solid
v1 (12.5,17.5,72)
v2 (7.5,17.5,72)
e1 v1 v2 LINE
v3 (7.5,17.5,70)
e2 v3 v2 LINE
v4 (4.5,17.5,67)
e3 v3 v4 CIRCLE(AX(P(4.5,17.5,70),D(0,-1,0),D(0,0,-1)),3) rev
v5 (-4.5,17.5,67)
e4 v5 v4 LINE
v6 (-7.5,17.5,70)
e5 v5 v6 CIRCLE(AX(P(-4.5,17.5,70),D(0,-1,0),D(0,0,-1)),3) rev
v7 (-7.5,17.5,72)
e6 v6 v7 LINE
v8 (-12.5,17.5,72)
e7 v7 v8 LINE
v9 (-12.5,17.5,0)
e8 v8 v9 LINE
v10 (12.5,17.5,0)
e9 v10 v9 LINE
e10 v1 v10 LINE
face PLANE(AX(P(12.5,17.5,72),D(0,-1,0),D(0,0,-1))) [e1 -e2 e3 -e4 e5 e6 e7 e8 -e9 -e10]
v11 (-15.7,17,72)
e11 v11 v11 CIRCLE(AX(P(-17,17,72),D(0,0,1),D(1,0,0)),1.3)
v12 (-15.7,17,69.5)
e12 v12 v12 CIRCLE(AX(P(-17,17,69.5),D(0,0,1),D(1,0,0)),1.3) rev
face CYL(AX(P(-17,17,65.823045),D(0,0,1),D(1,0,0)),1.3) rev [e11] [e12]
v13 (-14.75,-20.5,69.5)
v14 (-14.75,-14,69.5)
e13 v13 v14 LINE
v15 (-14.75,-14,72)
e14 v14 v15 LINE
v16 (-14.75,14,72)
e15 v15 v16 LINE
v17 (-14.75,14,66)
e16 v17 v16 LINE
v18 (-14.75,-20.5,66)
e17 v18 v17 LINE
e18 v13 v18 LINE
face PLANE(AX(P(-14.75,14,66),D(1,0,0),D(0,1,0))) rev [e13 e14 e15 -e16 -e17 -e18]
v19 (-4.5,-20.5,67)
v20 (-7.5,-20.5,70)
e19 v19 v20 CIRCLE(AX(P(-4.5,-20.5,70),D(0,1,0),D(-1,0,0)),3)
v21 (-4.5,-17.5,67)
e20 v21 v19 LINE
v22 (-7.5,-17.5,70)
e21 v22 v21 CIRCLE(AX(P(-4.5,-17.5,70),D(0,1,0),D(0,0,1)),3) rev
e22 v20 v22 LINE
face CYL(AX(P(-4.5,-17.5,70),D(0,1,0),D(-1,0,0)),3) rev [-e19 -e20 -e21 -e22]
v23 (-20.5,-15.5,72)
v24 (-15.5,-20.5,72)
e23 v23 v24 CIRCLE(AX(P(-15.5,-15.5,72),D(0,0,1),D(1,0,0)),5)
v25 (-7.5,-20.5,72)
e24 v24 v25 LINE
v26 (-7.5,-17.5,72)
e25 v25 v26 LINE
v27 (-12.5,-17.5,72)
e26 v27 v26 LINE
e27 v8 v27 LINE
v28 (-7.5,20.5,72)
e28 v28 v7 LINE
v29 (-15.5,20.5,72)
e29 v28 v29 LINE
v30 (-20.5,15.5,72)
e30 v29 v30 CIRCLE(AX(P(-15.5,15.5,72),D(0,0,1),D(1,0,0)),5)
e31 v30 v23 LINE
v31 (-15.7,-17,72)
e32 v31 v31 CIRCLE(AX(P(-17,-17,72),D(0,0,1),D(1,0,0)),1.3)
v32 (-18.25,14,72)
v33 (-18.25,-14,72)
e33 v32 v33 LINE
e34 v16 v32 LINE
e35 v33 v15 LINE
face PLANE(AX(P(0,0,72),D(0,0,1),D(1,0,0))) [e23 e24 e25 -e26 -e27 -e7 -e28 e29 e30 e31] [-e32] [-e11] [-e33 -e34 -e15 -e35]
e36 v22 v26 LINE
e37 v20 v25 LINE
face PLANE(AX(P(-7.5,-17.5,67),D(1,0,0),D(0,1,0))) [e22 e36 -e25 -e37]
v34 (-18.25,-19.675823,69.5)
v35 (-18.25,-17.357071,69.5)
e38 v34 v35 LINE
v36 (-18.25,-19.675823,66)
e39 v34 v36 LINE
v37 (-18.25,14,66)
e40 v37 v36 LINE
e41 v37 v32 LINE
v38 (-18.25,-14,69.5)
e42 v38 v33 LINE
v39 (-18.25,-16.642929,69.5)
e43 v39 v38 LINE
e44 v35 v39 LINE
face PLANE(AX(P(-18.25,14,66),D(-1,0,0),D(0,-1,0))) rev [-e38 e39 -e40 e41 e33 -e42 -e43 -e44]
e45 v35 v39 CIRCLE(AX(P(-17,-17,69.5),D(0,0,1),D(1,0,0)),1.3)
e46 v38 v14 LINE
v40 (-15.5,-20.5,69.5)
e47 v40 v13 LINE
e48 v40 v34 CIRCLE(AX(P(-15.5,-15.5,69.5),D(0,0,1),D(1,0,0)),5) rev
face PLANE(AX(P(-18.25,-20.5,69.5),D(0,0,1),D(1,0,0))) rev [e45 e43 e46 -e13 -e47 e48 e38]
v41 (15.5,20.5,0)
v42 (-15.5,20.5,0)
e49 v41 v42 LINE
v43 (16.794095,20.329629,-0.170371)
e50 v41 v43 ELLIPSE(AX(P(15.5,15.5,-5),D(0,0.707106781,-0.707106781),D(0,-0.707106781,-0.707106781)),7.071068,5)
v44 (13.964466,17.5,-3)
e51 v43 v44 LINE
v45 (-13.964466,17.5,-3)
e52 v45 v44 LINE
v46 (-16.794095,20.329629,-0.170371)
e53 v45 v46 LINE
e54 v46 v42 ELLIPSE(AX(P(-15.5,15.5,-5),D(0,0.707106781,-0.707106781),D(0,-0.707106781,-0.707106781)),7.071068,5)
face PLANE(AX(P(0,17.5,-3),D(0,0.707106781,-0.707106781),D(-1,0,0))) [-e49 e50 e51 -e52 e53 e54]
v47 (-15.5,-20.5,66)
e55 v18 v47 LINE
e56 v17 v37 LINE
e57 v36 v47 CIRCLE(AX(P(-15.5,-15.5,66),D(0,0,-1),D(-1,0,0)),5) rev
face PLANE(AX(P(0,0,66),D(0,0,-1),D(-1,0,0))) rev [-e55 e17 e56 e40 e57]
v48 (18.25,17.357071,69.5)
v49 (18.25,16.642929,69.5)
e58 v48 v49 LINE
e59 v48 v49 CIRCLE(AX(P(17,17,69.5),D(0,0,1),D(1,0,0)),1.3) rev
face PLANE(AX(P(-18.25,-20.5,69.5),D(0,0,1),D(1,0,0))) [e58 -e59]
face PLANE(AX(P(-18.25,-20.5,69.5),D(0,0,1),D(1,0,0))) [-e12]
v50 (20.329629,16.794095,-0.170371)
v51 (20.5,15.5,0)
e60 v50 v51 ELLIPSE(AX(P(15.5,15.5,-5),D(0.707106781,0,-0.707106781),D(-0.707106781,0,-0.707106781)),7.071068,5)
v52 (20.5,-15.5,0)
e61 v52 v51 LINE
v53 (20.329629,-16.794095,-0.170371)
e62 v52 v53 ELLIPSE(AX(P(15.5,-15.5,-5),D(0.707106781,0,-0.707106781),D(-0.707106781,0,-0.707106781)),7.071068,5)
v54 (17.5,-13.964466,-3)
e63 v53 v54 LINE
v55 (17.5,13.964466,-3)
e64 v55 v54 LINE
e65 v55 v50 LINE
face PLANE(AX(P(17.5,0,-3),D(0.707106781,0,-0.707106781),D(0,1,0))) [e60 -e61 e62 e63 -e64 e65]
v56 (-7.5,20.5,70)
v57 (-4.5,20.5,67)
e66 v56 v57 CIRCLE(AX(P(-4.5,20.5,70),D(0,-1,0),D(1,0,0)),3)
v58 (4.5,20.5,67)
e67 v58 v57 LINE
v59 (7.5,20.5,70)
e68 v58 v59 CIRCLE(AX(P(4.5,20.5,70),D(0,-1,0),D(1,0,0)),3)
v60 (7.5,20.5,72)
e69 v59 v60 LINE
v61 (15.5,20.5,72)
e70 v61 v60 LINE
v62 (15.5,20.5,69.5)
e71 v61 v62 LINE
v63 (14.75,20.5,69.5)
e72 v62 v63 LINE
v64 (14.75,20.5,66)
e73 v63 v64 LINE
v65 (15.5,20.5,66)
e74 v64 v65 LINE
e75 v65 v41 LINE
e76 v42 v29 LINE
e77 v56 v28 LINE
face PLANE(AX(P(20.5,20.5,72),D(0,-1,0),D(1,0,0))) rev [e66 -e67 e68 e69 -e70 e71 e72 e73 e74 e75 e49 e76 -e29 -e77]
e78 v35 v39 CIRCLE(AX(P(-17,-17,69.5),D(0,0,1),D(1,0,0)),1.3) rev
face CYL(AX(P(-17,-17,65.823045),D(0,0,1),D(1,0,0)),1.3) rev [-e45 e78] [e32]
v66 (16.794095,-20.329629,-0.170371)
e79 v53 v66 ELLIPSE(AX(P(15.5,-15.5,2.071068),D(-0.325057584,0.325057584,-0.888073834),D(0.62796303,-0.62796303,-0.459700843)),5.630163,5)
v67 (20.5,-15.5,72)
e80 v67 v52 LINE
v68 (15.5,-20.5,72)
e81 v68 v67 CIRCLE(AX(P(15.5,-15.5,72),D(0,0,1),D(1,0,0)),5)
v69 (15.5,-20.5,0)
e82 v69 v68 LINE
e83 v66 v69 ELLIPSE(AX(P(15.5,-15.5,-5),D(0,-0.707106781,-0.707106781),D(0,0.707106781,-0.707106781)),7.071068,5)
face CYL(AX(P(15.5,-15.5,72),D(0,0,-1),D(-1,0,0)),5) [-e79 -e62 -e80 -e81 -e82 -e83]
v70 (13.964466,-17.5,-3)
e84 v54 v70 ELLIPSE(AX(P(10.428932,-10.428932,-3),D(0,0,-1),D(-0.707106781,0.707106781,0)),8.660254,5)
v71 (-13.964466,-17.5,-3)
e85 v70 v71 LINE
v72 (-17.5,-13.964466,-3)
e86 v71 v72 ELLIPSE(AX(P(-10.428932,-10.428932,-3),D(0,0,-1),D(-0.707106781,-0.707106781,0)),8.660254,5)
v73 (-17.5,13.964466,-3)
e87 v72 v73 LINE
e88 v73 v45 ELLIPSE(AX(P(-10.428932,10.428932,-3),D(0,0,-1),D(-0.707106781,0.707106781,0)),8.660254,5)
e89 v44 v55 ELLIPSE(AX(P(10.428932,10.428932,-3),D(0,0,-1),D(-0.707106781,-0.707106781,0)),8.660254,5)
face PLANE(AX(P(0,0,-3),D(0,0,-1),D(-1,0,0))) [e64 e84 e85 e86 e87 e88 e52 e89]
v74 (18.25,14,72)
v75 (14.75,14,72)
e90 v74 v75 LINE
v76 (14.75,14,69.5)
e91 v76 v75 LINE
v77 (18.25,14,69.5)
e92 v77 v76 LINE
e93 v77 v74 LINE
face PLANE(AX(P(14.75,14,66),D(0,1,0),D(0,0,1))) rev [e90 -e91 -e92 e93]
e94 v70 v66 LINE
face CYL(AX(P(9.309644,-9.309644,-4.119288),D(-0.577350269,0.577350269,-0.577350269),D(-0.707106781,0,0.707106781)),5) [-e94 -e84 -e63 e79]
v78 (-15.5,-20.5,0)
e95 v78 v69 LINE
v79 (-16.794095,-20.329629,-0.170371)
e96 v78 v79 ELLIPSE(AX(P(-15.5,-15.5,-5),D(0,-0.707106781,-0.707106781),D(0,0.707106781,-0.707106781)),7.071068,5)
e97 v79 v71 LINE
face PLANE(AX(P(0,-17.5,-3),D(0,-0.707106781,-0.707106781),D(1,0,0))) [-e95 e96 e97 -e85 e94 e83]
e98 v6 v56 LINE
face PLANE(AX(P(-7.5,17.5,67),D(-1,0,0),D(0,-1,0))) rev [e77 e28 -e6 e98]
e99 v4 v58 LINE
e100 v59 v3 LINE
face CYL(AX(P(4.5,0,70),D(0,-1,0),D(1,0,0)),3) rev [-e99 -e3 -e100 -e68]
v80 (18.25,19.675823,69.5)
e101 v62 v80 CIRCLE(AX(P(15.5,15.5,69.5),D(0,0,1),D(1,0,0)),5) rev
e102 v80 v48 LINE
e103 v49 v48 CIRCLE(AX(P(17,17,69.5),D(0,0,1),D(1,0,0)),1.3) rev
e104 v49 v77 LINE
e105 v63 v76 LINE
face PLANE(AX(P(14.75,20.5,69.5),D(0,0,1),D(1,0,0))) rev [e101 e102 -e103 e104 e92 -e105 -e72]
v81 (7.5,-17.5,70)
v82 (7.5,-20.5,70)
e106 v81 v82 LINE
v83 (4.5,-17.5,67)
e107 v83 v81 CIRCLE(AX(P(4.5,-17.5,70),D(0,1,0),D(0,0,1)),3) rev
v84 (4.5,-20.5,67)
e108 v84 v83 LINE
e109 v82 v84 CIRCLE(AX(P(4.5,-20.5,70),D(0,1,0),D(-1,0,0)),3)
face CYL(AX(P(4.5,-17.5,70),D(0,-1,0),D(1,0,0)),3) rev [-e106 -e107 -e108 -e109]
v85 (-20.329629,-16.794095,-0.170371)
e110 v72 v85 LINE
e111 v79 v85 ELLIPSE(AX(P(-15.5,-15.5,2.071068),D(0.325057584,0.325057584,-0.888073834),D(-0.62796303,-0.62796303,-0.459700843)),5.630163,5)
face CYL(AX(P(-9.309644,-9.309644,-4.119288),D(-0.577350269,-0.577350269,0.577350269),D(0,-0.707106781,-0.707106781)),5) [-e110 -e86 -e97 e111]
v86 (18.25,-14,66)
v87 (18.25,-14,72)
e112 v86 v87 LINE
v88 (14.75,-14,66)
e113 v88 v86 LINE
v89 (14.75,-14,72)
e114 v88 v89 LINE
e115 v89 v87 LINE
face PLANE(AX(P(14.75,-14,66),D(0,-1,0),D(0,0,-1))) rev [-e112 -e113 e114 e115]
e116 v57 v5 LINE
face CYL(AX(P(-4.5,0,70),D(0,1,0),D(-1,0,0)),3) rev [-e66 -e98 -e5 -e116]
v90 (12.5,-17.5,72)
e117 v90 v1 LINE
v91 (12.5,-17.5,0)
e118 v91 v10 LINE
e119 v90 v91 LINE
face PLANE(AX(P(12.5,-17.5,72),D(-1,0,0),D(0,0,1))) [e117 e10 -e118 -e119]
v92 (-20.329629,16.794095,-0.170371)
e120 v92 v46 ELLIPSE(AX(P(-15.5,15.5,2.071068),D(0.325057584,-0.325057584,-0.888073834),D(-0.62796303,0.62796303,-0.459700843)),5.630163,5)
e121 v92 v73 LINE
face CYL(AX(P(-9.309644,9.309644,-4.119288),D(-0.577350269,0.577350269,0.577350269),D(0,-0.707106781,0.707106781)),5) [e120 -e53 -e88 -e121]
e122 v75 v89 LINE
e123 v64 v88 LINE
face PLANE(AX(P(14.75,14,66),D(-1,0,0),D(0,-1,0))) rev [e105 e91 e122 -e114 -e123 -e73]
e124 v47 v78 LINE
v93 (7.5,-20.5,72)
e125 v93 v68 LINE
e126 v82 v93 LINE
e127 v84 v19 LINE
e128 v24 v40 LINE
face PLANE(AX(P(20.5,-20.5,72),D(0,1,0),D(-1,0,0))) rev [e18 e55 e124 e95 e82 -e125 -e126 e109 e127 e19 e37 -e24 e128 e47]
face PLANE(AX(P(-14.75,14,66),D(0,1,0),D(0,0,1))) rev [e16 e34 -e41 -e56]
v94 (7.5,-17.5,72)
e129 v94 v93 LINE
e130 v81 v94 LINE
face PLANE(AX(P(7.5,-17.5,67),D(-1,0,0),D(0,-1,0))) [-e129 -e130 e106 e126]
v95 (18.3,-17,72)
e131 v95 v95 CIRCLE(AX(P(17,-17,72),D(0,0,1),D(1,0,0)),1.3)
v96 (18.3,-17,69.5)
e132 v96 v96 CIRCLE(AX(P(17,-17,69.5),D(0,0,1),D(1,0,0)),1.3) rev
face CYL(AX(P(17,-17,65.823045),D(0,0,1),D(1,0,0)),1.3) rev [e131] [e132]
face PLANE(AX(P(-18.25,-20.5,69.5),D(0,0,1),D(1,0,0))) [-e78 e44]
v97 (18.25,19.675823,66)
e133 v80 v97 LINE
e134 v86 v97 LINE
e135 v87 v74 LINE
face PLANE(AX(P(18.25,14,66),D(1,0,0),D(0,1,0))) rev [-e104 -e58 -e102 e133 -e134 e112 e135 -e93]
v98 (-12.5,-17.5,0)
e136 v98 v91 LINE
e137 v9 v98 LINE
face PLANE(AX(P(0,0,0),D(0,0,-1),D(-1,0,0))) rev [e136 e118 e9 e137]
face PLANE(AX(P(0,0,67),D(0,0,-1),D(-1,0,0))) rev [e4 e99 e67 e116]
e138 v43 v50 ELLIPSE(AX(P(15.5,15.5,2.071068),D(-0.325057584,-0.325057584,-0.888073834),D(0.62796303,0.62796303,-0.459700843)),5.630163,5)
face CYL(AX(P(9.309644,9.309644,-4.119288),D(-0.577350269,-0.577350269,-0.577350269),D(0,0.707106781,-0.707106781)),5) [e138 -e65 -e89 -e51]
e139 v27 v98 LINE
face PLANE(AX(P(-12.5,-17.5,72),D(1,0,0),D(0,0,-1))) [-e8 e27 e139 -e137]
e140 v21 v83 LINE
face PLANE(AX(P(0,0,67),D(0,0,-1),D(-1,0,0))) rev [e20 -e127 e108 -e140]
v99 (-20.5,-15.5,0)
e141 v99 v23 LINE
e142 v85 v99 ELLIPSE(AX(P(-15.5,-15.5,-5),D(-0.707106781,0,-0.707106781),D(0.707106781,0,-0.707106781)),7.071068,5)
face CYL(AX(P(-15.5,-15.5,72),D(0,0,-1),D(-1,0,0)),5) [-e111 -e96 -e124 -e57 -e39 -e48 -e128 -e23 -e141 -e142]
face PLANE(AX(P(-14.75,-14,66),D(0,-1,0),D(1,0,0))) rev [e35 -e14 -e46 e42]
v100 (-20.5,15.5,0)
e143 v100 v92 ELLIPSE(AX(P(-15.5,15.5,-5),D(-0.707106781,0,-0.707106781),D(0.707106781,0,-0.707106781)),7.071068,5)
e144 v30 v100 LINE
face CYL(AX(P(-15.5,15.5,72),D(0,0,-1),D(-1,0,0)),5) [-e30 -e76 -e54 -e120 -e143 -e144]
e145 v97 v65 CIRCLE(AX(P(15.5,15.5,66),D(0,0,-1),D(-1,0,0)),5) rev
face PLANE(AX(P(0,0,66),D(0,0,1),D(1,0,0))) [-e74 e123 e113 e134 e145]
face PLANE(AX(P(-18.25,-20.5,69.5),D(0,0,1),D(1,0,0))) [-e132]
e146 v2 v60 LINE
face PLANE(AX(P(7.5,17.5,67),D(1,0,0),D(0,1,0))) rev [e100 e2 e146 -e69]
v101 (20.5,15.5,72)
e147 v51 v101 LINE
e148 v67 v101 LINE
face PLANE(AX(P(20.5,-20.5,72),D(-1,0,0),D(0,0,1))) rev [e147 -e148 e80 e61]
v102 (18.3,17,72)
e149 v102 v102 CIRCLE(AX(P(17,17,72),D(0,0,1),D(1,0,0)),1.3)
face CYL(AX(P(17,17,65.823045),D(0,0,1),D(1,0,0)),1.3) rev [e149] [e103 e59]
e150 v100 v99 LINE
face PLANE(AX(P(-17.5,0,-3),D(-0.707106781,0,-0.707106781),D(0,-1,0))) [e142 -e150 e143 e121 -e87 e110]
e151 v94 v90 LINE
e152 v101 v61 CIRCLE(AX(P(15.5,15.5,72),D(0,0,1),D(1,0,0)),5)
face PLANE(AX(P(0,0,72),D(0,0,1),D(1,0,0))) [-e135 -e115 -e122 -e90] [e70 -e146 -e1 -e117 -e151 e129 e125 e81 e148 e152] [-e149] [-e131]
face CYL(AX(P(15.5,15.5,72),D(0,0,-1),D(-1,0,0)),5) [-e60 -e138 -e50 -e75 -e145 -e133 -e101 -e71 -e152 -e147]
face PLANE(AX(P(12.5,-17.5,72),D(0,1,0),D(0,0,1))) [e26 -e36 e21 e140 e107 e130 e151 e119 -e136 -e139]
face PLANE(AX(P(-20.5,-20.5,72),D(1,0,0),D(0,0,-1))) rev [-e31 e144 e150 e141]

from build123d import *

# Parameters (mm, degrees)
SKETCH_1_W             = 41
SKETCH_1_H             = 41
SKETCH_1_W_2           = 25
SKETCH_1_H_2           = 35
EXTRUDE_1_DEPTH        = 72
SKETCH_2_W             = 41
SKETCH_2_H             = 41
EXTRUDE_2_DEPTH        = 3
CHAMFER_1_SIZE         = 3
FILLET_1_R             = 5
SKETCH_3_W             = 15
SKETCH_3_H             = 3
CUT_EXTRUDE_1_DEPTH    = 5
FILLET_2_R             = 3
SKETCH_4_W             = 3.5
SKETCH_4_H             = 28
CUT_EXTRUDE_2_DEPTH    = 6
SKETCH_6_W             = 3.5
SKETCH_6_H             = 3.5
CUT_EXTRUDE_4_DEPTH    = 83.428757118
SKETCH_7_W             = 3.5
SKETCH_7_H             = 3.5
CUT_EXTRUDE_5_DEPTH    = 83.428757118
FILLET_2_OF_MIRROR_1_R = 3
SKETCH_8_R             = 1.3
CUT_EXTRUDE_6_DEPTH    = 2.5


with BuildPart() as part:
    # ｽｹｯﾁ1 → ﾎﾞｽ - 押し出し1 (new body)
    with BuildSketch(Plane.XY):
        Rectangle(SKETCH_1_W, SKETCH_1_H)
        Rectangle(SKETCH_1_W_2, SKETCH_1_H_2, mode=Mode.SUBTRACT)
    extrude(amount=EXTRUDE_1_DEPTH)

    # ｽｹｯﾁ2 → ﾎﾞｽ - 押し出し2 (add)
    with BuildSketch(Plane(origin=(0, 0, 0), x_dir=(-1, 0, 0), z_dir=(0, 0, -1))):
        Rectangle(SKETCH_2_W, SKETCH_2_H)
    extrude(amount=EXTRUDE_2_DEPTH)

    # 面取り1
    chamfer_1_edges = [part.edges().sort_by_distance(p)[0] for p in [
        (20.5, 0, -3),
        (0, -20.5, -3),
        (-20.5, 0, -3),
        (0, 20.5, -3),
    ]]
    chamfer(chamfer_1_edges, length=CHAMFER_1_SIZE)

    # ﾌｨﾚｯﾄ1
    # the kernel refuses this fillet: 5 mm, written as the material it takes off along each edge
    with BuildSketch(Plane(origin=(-20.5, 20.5, 84.5), x_dir=(0, -1, 0), z_dir=(0, 0, -1)), Plane(origin=(20.5, 20.5, -12.5), x_dir=(0, -1, 0), z_dir=(0, 0, 1)), Plane(origin=(20.5, -20.5, -12.5), x_dir=(-1, 0, 0), z_dir=(0, 0, 1)), Plane(origin=(-20.5, -20.5, 84.5), x_dir=(1, 0, 0), z_dir=(0, 0, -1))) as fillet_1_piece_1:
        with BuildLine():
            CenterArc((FILLET_1_R, -FILLET_1_R), FILLET_1_R, 90, 90)
            Line((0, -FILLET_1_R), (0, 0))
            Line((0, 0), (FILLET_1_R, 0))
        make_face()
    extrude(amount=97, mode=Mode.SUBTRACT)
    with BuildSketch(Plane(origin=(-24.666666667, -24.666666667, 4.166666667), x_dir=(0.816496580927726, -0.40824829046386285, 0.4082482904638632), z_dir=(0.5773502691896258, 0.5773502691896258, -0.5773502691896258))) as fillet_1_piece_2:
        with BuildLine():
            CenterArc((FILLET_1_R * 0.57735026919, -FILLET_1_R), FILLET_1_R, 90, 60)
            Line((-FILLET_1_R * 0.288675134595, -FILLET_1_R * 0.5), (0, 0))
            Line((0, 0), (FILLET_1_R * 0.57735026919, 0))
        make_face()
    extrude(amount=19.629909152, mode=Mode.SUBTRACT)
    with BuildSketch(Plane(origin=(24.666666667, -24.666666667, 4.166666667), x_dir=(-0.816496580927726, -0.40824829046386285, 0.4082482904638632), z_dir=(-0.5773502691896258, 0.5773502691896258, -0.5773502691896258)), Plane(origin=(-13.333333333, 13.333333333, -7.166666667), x_dir=(-0.40824829046386285, -0.816496580927726, 0.4082482904638632), z_dir=(-0.5773502691896258, 0.5773502691896258, 0.5773502691896258)), Plane(origin=(24.666666667, 24.666666667, 4.166666667), x_dir=(0.40824829046386285, -0.816496580927726, 0.4082482904638632), z_dir=(-0.5773502691896258, -0.5773502691896258, -0.5773502691896258))) as fillet_1_piece_3:
        with BuildLine():
            CenterArc((FILLET_1_R * 0.57735026919, FILLET_1_R), FILLET_1_R, 210, 60)
            Line((-FILLET_1_R * 0.288675134595, FILLET_1_R * 0.5), (0, 0))
            Line((0, 0), (FILLET_1_R * 0.57735026919, 0))
        make_face()
    extrude(amount=19.629909152, mode=Mode.SUBTRACT)

    # ｽｹｯﾁ3 → ｶｯﾄ - 押し出し1 (cut)
    with BuildSketch(Plane.XY.offset(72)):
        with Locations((0, 19)):
            Rectangle(SKETCH_3_W, SKETCH_3_H)
    cut_extrude_1 = extrude(amount=-CUT_EXTRUDE_1_DEPTH, mode=Mode.SUBTRACT)

    # ﾌｨﾚｯﾄ2
    fillet_2_edges = [part.edges().sort_by_distance(p)[0] for p in [
        (-7.5, 19, 67),
        (7.5, 19, 67),
    ]]
    fillet(fillet_2_edges, radius=FILLET_2_R)

    # ｽｹｯﾁ4 → ｶｯﾄ - 押し出し2 (cut)
    with BuildSketch(Plane.XY.offset(72)):
        with Locations((-16.5, 0)):
            Rectangle(SKETCH_4_W, SKETCH_4_H)
        with Locations((16.5, 0)):
            Rectangle(SKETCH_4_W, SKETCH_4_H)
    extrude(amount=-CUT_EXTRUDE_2_DEPTH, mode=Mode.SUBTRACT)

    # ｽｹｯﾁ6 → ｶｯﾄ - 押し出し4 (cut, through all)
    with BuildSketch(Plane.XZ.offset(-14)):
        with Locations((16.5, 67.75)):
            Rectangle(SKETCH_6_W, SKETCH_6_H)
    extrude(amount=-CUT_EXTRUDE_4_DEPTH, mode=Mode.SUBTRACT)

    # ｽｹｯﾁ7 → ｶｯﾄ - 押し出し5 (cut, through all)
    with BuildSketch(Plane(origin=(0, -14, 0), x_dir=(1, 0, 0), z_dir=(0, 1, 0))):
        with Locations((-16.5, -67.75)):
            Rectangle(SKETCH_7_W, SKETCH_7_H)
    extrude(amount=-CUT_EXTRUDE_5_DEPTH, mode=Mode.SUBTRACT)

    # ﾐﾗｰ1: ｶｯﾄ - 押し出し1 across plane
    add(cut_extrude_1.mirror(Plane.ZX), mode=Mode.SUBTRACT)

    # ﾌｨﾚｯﾄ2 of ﾐﾗｰ1
    fillet_2_of_mirror_1_edges = [part.edges().sort_by_distance(p)[0] for p in [
        (-7.5, -19, 67),
        (7.5, -19, 67),
    ]]
    fillet(fillet_2_of_mirror_1_edges, radius=FILLET_2_OF_MIRROR_1_R)

    # ｽｹｯﾁ8 → ｶｯﾄ - 押し出し6 (cut)
    with BuildSketch(Plane.XY.offset(72)):
        with Locations((17, 17)):
            Circle(SKETCH_8_R)
        with Locations((17, -17)):
            Circle(SKETCH_8_R)
        with Locations((-17, -17)):
            Circle(SKETCH_8_R)
        with Locations((-17, 17)):
            Circle(SKETCH_8_R)
    extrude(amount=-CUT_EXTRUDE_6_DEPTH, mode=Mode.SUBTRACT)


solid = part.part
